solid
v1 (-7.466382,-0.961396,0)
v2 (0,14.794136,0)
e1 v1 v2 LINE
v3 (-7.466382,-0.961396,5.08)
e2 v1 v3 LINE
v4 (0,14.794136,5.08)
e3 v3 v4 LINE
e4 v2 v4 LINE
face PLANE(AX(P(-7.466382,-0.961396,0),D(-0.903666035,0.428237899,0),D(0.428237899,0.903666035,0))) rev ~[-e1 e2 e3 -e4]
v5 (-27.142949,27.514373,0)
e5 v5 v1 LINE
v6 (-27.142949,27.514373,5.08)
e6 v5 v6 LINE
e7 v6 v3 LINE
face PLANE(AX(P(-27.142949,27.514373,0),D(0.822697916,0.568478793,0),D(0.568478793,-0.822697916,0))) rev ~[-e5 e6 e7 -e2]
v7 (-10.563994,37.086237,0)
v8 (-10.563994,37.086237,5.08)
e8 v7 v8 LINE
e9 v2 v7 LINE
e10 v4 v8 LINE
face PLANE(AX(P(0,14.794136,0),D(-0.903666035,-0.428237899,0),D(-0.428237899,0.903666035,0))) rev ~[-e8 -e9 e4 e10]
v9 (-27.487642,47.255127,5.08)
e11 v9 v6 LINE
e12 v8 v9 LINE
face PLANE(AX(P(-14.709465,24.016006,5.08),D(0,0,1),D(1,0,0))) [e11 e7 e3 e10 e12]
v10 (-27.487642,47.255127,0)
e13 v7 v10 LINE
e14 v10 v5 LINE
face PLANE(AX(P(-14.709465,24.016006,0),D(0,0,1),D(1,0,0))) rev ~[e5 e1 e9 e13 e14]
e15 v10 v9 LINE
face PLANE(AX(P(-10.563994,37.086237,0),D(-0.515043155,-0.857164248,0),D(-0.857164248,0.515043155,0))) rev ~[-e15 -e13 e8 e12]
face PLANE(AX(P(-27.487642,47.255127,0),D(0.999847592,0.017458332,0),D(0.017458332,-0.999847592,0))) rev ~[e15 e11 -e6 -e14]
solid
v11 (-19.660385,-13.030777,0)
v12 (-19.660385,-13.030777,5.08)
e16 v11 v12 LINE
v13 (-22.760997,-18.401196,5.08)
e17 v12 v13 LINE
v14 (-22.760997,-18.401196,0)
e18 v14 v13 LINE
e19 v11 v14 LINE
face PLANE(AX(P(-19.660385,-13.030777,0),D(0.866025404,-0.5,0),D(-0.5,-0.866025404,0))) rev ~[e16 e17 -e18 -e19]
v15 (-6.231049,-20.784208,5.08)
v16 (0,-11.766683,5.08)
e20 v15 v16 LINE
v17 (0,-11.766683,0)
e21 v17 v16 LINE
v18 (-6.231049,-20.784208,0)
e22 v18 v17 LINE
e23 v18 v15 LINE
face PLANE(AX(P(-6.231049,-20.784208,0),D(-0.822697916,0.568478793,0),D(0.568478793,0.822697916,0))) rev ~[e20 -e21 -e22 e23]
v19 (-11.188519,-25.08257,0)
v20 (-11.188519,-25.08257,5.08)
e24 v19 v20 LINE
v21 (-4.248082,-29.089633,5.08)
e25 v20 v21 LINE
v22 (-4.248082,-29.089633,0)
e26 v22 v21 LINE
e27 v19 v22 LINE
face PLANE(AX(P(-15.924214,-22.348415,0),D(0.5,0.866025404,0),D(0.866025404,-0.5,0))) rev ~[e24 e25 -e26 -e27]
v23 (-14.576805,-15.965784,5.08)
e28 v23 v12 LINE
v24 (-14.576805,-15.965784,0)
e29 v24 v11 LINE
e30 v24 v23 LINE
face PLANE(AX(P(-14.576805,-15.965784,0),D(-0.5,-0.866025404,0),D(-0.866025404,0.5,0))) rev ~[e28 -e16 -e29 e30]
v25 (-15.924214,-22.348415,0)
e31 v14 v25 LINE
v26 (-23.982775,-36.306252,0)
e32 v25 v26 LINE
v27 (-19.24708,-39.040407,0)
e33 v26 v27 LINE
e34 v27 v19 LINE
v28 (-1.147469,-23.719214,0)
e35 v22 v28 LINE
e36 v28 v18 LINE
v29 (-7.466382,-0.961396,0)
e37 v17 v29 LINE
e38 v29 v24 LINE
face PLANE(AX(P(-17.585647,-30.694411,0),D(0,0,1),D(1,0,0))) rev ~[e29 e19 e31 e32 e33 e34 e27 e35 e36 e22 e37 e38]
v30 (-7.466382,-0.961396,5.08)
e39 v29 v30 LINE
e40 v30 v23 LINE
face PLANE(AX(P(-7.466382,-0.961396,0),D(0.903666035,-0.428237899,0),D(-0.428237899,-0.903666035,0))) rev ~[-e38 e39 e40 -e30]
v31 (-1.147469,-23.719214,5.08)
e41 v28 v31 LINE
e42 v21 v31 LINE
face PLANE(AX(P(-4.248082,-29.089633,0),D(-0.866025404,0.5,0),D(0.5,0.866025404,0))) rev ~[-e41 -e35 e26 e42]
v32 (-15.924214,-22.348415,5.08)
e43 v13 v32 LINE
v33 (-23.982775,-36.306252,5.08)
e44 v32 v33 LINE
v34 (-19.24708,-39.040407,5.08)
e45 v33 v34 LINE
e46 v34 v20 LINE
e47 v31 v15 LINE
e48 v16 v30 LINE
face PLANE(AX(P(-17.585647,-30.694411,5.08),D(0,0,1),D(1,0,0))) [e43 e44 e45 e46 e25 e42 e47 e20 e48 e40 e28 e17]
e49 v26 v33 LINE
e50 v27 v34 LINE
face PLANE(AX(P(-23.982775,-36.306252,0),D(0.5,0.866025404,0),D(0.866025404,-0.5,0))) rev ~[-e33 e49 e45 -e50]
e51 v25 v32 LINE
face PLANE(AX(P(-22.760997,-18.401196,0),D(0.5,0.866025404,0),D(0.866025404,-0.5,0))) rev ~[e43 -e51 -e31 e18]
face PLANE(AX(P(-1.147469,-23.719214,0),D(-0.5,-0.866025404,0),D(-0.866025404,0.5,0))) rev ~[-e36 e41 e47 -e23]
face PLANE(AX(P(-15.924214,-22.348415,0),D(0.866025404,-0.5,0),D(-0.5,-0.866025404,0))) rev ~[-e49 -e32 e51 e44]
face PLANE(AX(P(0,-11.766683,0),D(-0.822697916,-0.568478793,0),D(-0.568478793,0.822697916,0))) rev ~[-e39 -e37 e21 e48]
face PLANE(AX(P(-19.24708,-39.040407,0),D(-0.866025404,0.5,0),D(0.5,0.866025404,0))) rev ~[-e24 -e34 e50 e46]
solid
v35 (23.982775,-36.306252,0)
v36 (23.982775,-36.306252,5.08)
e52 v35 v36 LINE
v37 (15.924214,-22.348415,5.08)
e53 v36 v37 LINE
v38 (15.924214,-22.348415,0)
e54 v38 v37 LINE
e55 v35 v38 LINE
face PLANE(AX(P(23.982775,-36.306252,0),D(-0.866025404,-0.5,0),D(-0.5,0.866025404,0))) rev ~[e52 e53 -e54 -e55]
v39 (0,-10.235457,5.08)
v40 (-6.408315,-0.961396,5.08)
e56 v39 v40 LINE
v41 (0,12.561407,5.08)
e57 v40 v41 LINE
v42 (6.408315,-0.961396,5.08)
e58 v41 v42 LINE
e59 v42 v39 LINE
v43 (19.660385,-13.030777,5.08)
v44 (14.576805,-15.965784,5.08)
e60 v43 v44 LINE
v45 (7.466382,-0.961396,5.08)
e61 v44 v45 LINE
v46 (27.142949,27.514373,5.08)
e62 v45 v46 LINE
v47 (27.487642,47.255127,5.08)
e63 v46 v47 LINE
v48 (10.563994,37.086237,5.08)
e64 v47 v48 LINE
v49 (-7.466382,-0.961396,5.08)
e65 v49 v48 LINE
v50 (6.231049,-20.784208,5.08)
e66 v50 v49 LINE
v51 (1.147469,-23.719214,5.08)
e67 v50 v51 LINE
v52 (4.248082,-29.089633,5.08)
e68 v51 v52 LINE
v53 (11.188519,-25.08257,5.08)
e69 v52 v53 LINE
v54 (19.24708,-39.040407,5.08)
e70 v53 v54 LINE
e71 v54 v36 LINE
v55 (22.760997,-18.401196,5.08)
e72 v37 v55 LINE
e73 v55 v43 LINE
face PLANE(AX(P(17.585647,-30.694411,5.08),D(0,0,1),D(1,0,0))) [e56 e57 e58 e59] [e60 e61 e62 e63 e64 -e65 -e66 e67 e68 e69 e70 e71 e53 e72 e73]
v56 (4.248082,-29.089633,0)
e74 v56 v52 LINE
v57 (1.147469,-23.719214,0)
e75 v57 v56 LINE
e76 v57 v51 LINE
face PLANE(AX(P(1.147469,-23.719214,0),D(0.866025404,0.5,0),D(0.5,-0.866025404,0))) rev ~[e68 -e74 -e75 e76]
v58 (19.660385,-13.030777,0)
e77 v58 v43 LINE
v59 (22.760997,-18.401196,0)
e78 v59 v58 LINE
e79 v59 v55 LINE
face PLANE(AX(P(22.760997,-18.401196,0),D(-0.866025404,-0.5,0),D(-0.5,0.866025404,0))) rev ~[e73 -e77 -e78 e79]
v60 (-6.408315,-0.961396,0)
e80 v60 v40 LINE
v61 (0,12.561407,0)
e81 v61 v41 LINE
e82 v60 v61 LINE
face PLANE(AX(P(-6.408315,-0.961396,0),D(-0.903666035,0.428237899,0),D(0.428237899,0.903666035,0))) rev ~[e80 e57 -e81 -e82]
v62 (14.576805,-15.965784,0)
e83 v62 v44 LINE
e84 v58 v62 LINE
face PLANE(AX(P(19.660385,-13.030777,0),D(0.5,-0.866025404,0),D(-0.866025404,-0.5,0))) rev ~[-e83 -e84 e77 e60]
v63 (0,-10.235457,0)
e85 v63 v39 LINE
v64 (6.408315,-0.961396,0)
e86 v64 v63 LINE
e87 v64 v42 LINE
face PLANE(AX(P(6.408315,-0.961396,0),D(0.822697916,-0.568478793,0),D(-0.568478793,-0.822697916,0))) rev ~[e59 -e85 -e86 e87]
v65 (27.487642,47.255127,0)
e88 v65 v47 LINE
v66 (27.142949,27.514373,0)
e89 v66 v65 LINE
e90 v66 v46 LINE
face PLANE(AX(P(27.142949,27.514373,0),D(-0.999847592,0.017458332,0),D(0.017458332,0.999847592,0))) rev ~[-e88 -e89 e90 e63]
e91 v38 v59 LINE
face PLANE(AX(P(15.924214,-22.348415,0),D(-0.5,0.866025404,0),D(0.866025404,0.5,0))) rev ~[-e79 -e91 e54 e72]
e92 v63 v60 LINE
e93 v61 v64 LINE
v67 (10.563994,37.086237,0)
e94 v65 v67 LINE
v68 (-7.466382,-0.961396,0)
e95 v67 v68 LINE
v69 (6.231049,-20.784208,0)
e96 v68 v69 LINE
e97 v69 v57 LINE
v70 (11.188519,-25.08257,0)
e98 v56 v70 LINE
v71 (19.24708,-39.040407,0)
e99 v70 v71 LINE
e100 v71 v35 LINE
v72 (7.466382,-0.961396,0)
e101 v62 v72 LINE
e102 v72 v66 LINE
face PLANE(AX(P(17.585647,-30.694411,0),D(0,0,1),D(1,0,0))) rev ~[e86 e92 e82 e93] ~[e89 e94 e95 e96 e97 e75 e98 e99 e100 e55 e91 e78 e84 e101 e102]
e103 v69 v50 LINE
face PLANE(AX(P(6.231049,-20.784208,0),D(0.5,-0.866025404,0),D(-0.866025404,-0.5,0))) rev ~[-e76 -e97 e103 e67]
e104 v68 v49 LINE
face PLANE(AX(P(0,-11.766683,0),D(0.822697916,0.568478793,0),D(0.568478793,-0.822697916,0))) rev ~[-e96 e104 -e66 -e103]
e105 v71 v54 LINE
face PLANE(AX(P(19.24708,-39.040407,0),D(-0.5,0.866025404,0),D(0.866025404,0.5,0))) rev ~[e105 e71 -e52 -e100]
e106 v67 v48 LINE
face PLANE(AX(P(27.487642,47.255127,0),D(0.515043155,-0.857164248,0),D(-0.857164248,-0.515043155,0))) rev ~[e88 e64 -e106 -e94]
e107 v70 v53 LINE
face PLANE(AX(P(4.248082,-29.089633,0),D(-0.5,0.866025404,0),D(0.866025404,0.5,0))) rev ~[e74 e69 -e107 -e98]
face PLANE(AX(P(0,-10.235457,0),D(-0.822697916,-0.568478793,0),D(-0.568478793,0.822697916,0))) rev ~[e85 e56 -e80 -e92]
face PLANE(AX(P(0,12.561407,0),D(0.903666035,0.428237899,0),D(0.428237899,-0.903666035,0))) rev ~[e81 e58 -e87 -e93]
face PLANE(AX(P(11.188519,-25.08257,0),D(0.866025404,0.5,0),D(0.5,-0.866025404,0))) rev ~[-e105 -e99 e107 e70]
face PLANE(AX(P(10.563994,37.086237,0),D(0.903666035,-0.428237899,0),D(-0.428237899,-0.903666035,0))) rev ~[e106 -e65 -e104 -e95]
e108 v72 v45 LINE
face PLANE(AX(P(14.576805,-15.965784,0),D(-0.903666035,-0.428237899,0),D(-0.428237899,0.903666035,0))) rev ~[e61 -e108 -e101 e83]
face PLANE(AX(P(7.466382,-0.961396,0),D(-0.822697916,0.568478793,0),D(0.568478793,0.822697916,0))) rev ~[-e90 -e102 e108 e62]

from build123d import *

# Parameters (mm, degrees)
F1_DEPTH = 5.08
F2_DEPTH = 5.08
F3_DEPTH = 5.08
F4_DEPTH = 5.08
F5_DEPTH = 5.08
F6_DEPTH = 5.08
F7_DEPTH = 5.08
F8_DEPTH = 5.08
F9_DEPTH = 5.08


with BuildPart() as f1:
    # F0 (on Top) → F1 (new body)
    with BuildSketch(Plane.XY):
        Polygon((-27.1429486431, 27.5143728866), (-7.4663818198, -0.961395638), (0, 14.7941357478), (-10.5639939546, 37.0862368388), (-27.4876418162, 47.2551268799), align=None)
    extrude(amount=F1_DEPTH)


with BuildPart() as f2:
    # F0 (on Top) → F2 (new body)
    with BuildSketch(Plane.XY):
        Polygon((-7.4663818198, -0.961395638), (-14.5768045919, -15.965783554), (-6.231049466, -20.7842075226), (0, -11.7666830809), align=None)
    extrude(amount=F2_DEPTH)

    # F0 (on Top) → F7 (join)
    with BuildSketch(Plane.XY):
        Polygon((-19.660384601, -13.0307772673), (-22.7609974951, -18.4011963345), (-15.9242138402, -22.348415218), (-11.1885193949, -25.0825696808), (-4.248082351, -29.0896328764), (-1.1474694569, -23.7192138093), (-6.231049466, -20.7842075226), (-14.5768045919, -15.965783554), align=None)
    extrude(amount=F7_DEPTH)

    # F0 (on Top) → F8 (join)
    with BuildSketch(Plane.XY):
        Polygon((-11.1885193949, -25.0825696808), (-15.9242138402, -22.348415218), (-23.9827748524, -36.3062523269), (-19.2470804071, -39.0404067898), align=None)
    extrude(amount=F8_DEPTH)


with BuildPart() as f3:
    # F0 (on Top) → F3 (new body)
    with BuildSketch(Plane.XY):
        Polygon((0, 14.7941357478), (-7.4663818198, -0.961395638), (0, -11.7666830809), (7.4663818198, -0.961395638), align=None)
        Polygon((-6.4083149498, -0.961395638), (0, 12.5614069402), (6.4083149498, -0.961395638), (0, -10.2354572557), align=None, mode=Mode.SUBTRACT)
    extrude(amount=F3_DEPTH)

    # F0 (on Top) → F4 (join)
    with BuildSketch(Plane.XY):
        Polygon((10.5639939546, 37.0862368388), (0, 14.7941357478), (7.4663818198, -0.961395638), (27.1429486431, 27.5143728866), (27.4876418162, 47.2551268799), align=None)
    extrude(amount=F4_DEPTH)

    # F0 (on Top) → F5 (join)
    with BuildSketch(Plane.XY):
        Polygon((7.4663818198, -0.961395638), (0, -11.7666830809), (6.231049466, -20.7842075226), (14.5768045919, -15.965783554), align=None)
    extrude(amount=F5_DEPTH)

    # F0 (on Top) → F6 (join)
    with BuildSketch(Plane.XY):
        Polygon((14.5768045919, -15.965783554), (6.231049466, -20.7842075226), (1.1474694569, -23.7192138093), (4.248082351, -29.0896328764), (11.1885193949, -25.0825696808), (15.9242138402, -22.348415218), (22.7609974951, -18.4011963345), (19.660384601, -13.0307772673), align=None)
    extrude(amount=F6_DEPTH)

    # F0 (on Top) → F9 (join)
    with BuildSketch(Plane.XY):
        Polygon((15.9242138402, -22.348415218), (11.1885193949, -25.0825696808), (19.2470804071, -39.0404067898), (23.9827748524, -36.3062523269), align=None)
    extrude(amount=F9_DEPTH)


solid = Compound([f1.part, f2.part, f3.part])
